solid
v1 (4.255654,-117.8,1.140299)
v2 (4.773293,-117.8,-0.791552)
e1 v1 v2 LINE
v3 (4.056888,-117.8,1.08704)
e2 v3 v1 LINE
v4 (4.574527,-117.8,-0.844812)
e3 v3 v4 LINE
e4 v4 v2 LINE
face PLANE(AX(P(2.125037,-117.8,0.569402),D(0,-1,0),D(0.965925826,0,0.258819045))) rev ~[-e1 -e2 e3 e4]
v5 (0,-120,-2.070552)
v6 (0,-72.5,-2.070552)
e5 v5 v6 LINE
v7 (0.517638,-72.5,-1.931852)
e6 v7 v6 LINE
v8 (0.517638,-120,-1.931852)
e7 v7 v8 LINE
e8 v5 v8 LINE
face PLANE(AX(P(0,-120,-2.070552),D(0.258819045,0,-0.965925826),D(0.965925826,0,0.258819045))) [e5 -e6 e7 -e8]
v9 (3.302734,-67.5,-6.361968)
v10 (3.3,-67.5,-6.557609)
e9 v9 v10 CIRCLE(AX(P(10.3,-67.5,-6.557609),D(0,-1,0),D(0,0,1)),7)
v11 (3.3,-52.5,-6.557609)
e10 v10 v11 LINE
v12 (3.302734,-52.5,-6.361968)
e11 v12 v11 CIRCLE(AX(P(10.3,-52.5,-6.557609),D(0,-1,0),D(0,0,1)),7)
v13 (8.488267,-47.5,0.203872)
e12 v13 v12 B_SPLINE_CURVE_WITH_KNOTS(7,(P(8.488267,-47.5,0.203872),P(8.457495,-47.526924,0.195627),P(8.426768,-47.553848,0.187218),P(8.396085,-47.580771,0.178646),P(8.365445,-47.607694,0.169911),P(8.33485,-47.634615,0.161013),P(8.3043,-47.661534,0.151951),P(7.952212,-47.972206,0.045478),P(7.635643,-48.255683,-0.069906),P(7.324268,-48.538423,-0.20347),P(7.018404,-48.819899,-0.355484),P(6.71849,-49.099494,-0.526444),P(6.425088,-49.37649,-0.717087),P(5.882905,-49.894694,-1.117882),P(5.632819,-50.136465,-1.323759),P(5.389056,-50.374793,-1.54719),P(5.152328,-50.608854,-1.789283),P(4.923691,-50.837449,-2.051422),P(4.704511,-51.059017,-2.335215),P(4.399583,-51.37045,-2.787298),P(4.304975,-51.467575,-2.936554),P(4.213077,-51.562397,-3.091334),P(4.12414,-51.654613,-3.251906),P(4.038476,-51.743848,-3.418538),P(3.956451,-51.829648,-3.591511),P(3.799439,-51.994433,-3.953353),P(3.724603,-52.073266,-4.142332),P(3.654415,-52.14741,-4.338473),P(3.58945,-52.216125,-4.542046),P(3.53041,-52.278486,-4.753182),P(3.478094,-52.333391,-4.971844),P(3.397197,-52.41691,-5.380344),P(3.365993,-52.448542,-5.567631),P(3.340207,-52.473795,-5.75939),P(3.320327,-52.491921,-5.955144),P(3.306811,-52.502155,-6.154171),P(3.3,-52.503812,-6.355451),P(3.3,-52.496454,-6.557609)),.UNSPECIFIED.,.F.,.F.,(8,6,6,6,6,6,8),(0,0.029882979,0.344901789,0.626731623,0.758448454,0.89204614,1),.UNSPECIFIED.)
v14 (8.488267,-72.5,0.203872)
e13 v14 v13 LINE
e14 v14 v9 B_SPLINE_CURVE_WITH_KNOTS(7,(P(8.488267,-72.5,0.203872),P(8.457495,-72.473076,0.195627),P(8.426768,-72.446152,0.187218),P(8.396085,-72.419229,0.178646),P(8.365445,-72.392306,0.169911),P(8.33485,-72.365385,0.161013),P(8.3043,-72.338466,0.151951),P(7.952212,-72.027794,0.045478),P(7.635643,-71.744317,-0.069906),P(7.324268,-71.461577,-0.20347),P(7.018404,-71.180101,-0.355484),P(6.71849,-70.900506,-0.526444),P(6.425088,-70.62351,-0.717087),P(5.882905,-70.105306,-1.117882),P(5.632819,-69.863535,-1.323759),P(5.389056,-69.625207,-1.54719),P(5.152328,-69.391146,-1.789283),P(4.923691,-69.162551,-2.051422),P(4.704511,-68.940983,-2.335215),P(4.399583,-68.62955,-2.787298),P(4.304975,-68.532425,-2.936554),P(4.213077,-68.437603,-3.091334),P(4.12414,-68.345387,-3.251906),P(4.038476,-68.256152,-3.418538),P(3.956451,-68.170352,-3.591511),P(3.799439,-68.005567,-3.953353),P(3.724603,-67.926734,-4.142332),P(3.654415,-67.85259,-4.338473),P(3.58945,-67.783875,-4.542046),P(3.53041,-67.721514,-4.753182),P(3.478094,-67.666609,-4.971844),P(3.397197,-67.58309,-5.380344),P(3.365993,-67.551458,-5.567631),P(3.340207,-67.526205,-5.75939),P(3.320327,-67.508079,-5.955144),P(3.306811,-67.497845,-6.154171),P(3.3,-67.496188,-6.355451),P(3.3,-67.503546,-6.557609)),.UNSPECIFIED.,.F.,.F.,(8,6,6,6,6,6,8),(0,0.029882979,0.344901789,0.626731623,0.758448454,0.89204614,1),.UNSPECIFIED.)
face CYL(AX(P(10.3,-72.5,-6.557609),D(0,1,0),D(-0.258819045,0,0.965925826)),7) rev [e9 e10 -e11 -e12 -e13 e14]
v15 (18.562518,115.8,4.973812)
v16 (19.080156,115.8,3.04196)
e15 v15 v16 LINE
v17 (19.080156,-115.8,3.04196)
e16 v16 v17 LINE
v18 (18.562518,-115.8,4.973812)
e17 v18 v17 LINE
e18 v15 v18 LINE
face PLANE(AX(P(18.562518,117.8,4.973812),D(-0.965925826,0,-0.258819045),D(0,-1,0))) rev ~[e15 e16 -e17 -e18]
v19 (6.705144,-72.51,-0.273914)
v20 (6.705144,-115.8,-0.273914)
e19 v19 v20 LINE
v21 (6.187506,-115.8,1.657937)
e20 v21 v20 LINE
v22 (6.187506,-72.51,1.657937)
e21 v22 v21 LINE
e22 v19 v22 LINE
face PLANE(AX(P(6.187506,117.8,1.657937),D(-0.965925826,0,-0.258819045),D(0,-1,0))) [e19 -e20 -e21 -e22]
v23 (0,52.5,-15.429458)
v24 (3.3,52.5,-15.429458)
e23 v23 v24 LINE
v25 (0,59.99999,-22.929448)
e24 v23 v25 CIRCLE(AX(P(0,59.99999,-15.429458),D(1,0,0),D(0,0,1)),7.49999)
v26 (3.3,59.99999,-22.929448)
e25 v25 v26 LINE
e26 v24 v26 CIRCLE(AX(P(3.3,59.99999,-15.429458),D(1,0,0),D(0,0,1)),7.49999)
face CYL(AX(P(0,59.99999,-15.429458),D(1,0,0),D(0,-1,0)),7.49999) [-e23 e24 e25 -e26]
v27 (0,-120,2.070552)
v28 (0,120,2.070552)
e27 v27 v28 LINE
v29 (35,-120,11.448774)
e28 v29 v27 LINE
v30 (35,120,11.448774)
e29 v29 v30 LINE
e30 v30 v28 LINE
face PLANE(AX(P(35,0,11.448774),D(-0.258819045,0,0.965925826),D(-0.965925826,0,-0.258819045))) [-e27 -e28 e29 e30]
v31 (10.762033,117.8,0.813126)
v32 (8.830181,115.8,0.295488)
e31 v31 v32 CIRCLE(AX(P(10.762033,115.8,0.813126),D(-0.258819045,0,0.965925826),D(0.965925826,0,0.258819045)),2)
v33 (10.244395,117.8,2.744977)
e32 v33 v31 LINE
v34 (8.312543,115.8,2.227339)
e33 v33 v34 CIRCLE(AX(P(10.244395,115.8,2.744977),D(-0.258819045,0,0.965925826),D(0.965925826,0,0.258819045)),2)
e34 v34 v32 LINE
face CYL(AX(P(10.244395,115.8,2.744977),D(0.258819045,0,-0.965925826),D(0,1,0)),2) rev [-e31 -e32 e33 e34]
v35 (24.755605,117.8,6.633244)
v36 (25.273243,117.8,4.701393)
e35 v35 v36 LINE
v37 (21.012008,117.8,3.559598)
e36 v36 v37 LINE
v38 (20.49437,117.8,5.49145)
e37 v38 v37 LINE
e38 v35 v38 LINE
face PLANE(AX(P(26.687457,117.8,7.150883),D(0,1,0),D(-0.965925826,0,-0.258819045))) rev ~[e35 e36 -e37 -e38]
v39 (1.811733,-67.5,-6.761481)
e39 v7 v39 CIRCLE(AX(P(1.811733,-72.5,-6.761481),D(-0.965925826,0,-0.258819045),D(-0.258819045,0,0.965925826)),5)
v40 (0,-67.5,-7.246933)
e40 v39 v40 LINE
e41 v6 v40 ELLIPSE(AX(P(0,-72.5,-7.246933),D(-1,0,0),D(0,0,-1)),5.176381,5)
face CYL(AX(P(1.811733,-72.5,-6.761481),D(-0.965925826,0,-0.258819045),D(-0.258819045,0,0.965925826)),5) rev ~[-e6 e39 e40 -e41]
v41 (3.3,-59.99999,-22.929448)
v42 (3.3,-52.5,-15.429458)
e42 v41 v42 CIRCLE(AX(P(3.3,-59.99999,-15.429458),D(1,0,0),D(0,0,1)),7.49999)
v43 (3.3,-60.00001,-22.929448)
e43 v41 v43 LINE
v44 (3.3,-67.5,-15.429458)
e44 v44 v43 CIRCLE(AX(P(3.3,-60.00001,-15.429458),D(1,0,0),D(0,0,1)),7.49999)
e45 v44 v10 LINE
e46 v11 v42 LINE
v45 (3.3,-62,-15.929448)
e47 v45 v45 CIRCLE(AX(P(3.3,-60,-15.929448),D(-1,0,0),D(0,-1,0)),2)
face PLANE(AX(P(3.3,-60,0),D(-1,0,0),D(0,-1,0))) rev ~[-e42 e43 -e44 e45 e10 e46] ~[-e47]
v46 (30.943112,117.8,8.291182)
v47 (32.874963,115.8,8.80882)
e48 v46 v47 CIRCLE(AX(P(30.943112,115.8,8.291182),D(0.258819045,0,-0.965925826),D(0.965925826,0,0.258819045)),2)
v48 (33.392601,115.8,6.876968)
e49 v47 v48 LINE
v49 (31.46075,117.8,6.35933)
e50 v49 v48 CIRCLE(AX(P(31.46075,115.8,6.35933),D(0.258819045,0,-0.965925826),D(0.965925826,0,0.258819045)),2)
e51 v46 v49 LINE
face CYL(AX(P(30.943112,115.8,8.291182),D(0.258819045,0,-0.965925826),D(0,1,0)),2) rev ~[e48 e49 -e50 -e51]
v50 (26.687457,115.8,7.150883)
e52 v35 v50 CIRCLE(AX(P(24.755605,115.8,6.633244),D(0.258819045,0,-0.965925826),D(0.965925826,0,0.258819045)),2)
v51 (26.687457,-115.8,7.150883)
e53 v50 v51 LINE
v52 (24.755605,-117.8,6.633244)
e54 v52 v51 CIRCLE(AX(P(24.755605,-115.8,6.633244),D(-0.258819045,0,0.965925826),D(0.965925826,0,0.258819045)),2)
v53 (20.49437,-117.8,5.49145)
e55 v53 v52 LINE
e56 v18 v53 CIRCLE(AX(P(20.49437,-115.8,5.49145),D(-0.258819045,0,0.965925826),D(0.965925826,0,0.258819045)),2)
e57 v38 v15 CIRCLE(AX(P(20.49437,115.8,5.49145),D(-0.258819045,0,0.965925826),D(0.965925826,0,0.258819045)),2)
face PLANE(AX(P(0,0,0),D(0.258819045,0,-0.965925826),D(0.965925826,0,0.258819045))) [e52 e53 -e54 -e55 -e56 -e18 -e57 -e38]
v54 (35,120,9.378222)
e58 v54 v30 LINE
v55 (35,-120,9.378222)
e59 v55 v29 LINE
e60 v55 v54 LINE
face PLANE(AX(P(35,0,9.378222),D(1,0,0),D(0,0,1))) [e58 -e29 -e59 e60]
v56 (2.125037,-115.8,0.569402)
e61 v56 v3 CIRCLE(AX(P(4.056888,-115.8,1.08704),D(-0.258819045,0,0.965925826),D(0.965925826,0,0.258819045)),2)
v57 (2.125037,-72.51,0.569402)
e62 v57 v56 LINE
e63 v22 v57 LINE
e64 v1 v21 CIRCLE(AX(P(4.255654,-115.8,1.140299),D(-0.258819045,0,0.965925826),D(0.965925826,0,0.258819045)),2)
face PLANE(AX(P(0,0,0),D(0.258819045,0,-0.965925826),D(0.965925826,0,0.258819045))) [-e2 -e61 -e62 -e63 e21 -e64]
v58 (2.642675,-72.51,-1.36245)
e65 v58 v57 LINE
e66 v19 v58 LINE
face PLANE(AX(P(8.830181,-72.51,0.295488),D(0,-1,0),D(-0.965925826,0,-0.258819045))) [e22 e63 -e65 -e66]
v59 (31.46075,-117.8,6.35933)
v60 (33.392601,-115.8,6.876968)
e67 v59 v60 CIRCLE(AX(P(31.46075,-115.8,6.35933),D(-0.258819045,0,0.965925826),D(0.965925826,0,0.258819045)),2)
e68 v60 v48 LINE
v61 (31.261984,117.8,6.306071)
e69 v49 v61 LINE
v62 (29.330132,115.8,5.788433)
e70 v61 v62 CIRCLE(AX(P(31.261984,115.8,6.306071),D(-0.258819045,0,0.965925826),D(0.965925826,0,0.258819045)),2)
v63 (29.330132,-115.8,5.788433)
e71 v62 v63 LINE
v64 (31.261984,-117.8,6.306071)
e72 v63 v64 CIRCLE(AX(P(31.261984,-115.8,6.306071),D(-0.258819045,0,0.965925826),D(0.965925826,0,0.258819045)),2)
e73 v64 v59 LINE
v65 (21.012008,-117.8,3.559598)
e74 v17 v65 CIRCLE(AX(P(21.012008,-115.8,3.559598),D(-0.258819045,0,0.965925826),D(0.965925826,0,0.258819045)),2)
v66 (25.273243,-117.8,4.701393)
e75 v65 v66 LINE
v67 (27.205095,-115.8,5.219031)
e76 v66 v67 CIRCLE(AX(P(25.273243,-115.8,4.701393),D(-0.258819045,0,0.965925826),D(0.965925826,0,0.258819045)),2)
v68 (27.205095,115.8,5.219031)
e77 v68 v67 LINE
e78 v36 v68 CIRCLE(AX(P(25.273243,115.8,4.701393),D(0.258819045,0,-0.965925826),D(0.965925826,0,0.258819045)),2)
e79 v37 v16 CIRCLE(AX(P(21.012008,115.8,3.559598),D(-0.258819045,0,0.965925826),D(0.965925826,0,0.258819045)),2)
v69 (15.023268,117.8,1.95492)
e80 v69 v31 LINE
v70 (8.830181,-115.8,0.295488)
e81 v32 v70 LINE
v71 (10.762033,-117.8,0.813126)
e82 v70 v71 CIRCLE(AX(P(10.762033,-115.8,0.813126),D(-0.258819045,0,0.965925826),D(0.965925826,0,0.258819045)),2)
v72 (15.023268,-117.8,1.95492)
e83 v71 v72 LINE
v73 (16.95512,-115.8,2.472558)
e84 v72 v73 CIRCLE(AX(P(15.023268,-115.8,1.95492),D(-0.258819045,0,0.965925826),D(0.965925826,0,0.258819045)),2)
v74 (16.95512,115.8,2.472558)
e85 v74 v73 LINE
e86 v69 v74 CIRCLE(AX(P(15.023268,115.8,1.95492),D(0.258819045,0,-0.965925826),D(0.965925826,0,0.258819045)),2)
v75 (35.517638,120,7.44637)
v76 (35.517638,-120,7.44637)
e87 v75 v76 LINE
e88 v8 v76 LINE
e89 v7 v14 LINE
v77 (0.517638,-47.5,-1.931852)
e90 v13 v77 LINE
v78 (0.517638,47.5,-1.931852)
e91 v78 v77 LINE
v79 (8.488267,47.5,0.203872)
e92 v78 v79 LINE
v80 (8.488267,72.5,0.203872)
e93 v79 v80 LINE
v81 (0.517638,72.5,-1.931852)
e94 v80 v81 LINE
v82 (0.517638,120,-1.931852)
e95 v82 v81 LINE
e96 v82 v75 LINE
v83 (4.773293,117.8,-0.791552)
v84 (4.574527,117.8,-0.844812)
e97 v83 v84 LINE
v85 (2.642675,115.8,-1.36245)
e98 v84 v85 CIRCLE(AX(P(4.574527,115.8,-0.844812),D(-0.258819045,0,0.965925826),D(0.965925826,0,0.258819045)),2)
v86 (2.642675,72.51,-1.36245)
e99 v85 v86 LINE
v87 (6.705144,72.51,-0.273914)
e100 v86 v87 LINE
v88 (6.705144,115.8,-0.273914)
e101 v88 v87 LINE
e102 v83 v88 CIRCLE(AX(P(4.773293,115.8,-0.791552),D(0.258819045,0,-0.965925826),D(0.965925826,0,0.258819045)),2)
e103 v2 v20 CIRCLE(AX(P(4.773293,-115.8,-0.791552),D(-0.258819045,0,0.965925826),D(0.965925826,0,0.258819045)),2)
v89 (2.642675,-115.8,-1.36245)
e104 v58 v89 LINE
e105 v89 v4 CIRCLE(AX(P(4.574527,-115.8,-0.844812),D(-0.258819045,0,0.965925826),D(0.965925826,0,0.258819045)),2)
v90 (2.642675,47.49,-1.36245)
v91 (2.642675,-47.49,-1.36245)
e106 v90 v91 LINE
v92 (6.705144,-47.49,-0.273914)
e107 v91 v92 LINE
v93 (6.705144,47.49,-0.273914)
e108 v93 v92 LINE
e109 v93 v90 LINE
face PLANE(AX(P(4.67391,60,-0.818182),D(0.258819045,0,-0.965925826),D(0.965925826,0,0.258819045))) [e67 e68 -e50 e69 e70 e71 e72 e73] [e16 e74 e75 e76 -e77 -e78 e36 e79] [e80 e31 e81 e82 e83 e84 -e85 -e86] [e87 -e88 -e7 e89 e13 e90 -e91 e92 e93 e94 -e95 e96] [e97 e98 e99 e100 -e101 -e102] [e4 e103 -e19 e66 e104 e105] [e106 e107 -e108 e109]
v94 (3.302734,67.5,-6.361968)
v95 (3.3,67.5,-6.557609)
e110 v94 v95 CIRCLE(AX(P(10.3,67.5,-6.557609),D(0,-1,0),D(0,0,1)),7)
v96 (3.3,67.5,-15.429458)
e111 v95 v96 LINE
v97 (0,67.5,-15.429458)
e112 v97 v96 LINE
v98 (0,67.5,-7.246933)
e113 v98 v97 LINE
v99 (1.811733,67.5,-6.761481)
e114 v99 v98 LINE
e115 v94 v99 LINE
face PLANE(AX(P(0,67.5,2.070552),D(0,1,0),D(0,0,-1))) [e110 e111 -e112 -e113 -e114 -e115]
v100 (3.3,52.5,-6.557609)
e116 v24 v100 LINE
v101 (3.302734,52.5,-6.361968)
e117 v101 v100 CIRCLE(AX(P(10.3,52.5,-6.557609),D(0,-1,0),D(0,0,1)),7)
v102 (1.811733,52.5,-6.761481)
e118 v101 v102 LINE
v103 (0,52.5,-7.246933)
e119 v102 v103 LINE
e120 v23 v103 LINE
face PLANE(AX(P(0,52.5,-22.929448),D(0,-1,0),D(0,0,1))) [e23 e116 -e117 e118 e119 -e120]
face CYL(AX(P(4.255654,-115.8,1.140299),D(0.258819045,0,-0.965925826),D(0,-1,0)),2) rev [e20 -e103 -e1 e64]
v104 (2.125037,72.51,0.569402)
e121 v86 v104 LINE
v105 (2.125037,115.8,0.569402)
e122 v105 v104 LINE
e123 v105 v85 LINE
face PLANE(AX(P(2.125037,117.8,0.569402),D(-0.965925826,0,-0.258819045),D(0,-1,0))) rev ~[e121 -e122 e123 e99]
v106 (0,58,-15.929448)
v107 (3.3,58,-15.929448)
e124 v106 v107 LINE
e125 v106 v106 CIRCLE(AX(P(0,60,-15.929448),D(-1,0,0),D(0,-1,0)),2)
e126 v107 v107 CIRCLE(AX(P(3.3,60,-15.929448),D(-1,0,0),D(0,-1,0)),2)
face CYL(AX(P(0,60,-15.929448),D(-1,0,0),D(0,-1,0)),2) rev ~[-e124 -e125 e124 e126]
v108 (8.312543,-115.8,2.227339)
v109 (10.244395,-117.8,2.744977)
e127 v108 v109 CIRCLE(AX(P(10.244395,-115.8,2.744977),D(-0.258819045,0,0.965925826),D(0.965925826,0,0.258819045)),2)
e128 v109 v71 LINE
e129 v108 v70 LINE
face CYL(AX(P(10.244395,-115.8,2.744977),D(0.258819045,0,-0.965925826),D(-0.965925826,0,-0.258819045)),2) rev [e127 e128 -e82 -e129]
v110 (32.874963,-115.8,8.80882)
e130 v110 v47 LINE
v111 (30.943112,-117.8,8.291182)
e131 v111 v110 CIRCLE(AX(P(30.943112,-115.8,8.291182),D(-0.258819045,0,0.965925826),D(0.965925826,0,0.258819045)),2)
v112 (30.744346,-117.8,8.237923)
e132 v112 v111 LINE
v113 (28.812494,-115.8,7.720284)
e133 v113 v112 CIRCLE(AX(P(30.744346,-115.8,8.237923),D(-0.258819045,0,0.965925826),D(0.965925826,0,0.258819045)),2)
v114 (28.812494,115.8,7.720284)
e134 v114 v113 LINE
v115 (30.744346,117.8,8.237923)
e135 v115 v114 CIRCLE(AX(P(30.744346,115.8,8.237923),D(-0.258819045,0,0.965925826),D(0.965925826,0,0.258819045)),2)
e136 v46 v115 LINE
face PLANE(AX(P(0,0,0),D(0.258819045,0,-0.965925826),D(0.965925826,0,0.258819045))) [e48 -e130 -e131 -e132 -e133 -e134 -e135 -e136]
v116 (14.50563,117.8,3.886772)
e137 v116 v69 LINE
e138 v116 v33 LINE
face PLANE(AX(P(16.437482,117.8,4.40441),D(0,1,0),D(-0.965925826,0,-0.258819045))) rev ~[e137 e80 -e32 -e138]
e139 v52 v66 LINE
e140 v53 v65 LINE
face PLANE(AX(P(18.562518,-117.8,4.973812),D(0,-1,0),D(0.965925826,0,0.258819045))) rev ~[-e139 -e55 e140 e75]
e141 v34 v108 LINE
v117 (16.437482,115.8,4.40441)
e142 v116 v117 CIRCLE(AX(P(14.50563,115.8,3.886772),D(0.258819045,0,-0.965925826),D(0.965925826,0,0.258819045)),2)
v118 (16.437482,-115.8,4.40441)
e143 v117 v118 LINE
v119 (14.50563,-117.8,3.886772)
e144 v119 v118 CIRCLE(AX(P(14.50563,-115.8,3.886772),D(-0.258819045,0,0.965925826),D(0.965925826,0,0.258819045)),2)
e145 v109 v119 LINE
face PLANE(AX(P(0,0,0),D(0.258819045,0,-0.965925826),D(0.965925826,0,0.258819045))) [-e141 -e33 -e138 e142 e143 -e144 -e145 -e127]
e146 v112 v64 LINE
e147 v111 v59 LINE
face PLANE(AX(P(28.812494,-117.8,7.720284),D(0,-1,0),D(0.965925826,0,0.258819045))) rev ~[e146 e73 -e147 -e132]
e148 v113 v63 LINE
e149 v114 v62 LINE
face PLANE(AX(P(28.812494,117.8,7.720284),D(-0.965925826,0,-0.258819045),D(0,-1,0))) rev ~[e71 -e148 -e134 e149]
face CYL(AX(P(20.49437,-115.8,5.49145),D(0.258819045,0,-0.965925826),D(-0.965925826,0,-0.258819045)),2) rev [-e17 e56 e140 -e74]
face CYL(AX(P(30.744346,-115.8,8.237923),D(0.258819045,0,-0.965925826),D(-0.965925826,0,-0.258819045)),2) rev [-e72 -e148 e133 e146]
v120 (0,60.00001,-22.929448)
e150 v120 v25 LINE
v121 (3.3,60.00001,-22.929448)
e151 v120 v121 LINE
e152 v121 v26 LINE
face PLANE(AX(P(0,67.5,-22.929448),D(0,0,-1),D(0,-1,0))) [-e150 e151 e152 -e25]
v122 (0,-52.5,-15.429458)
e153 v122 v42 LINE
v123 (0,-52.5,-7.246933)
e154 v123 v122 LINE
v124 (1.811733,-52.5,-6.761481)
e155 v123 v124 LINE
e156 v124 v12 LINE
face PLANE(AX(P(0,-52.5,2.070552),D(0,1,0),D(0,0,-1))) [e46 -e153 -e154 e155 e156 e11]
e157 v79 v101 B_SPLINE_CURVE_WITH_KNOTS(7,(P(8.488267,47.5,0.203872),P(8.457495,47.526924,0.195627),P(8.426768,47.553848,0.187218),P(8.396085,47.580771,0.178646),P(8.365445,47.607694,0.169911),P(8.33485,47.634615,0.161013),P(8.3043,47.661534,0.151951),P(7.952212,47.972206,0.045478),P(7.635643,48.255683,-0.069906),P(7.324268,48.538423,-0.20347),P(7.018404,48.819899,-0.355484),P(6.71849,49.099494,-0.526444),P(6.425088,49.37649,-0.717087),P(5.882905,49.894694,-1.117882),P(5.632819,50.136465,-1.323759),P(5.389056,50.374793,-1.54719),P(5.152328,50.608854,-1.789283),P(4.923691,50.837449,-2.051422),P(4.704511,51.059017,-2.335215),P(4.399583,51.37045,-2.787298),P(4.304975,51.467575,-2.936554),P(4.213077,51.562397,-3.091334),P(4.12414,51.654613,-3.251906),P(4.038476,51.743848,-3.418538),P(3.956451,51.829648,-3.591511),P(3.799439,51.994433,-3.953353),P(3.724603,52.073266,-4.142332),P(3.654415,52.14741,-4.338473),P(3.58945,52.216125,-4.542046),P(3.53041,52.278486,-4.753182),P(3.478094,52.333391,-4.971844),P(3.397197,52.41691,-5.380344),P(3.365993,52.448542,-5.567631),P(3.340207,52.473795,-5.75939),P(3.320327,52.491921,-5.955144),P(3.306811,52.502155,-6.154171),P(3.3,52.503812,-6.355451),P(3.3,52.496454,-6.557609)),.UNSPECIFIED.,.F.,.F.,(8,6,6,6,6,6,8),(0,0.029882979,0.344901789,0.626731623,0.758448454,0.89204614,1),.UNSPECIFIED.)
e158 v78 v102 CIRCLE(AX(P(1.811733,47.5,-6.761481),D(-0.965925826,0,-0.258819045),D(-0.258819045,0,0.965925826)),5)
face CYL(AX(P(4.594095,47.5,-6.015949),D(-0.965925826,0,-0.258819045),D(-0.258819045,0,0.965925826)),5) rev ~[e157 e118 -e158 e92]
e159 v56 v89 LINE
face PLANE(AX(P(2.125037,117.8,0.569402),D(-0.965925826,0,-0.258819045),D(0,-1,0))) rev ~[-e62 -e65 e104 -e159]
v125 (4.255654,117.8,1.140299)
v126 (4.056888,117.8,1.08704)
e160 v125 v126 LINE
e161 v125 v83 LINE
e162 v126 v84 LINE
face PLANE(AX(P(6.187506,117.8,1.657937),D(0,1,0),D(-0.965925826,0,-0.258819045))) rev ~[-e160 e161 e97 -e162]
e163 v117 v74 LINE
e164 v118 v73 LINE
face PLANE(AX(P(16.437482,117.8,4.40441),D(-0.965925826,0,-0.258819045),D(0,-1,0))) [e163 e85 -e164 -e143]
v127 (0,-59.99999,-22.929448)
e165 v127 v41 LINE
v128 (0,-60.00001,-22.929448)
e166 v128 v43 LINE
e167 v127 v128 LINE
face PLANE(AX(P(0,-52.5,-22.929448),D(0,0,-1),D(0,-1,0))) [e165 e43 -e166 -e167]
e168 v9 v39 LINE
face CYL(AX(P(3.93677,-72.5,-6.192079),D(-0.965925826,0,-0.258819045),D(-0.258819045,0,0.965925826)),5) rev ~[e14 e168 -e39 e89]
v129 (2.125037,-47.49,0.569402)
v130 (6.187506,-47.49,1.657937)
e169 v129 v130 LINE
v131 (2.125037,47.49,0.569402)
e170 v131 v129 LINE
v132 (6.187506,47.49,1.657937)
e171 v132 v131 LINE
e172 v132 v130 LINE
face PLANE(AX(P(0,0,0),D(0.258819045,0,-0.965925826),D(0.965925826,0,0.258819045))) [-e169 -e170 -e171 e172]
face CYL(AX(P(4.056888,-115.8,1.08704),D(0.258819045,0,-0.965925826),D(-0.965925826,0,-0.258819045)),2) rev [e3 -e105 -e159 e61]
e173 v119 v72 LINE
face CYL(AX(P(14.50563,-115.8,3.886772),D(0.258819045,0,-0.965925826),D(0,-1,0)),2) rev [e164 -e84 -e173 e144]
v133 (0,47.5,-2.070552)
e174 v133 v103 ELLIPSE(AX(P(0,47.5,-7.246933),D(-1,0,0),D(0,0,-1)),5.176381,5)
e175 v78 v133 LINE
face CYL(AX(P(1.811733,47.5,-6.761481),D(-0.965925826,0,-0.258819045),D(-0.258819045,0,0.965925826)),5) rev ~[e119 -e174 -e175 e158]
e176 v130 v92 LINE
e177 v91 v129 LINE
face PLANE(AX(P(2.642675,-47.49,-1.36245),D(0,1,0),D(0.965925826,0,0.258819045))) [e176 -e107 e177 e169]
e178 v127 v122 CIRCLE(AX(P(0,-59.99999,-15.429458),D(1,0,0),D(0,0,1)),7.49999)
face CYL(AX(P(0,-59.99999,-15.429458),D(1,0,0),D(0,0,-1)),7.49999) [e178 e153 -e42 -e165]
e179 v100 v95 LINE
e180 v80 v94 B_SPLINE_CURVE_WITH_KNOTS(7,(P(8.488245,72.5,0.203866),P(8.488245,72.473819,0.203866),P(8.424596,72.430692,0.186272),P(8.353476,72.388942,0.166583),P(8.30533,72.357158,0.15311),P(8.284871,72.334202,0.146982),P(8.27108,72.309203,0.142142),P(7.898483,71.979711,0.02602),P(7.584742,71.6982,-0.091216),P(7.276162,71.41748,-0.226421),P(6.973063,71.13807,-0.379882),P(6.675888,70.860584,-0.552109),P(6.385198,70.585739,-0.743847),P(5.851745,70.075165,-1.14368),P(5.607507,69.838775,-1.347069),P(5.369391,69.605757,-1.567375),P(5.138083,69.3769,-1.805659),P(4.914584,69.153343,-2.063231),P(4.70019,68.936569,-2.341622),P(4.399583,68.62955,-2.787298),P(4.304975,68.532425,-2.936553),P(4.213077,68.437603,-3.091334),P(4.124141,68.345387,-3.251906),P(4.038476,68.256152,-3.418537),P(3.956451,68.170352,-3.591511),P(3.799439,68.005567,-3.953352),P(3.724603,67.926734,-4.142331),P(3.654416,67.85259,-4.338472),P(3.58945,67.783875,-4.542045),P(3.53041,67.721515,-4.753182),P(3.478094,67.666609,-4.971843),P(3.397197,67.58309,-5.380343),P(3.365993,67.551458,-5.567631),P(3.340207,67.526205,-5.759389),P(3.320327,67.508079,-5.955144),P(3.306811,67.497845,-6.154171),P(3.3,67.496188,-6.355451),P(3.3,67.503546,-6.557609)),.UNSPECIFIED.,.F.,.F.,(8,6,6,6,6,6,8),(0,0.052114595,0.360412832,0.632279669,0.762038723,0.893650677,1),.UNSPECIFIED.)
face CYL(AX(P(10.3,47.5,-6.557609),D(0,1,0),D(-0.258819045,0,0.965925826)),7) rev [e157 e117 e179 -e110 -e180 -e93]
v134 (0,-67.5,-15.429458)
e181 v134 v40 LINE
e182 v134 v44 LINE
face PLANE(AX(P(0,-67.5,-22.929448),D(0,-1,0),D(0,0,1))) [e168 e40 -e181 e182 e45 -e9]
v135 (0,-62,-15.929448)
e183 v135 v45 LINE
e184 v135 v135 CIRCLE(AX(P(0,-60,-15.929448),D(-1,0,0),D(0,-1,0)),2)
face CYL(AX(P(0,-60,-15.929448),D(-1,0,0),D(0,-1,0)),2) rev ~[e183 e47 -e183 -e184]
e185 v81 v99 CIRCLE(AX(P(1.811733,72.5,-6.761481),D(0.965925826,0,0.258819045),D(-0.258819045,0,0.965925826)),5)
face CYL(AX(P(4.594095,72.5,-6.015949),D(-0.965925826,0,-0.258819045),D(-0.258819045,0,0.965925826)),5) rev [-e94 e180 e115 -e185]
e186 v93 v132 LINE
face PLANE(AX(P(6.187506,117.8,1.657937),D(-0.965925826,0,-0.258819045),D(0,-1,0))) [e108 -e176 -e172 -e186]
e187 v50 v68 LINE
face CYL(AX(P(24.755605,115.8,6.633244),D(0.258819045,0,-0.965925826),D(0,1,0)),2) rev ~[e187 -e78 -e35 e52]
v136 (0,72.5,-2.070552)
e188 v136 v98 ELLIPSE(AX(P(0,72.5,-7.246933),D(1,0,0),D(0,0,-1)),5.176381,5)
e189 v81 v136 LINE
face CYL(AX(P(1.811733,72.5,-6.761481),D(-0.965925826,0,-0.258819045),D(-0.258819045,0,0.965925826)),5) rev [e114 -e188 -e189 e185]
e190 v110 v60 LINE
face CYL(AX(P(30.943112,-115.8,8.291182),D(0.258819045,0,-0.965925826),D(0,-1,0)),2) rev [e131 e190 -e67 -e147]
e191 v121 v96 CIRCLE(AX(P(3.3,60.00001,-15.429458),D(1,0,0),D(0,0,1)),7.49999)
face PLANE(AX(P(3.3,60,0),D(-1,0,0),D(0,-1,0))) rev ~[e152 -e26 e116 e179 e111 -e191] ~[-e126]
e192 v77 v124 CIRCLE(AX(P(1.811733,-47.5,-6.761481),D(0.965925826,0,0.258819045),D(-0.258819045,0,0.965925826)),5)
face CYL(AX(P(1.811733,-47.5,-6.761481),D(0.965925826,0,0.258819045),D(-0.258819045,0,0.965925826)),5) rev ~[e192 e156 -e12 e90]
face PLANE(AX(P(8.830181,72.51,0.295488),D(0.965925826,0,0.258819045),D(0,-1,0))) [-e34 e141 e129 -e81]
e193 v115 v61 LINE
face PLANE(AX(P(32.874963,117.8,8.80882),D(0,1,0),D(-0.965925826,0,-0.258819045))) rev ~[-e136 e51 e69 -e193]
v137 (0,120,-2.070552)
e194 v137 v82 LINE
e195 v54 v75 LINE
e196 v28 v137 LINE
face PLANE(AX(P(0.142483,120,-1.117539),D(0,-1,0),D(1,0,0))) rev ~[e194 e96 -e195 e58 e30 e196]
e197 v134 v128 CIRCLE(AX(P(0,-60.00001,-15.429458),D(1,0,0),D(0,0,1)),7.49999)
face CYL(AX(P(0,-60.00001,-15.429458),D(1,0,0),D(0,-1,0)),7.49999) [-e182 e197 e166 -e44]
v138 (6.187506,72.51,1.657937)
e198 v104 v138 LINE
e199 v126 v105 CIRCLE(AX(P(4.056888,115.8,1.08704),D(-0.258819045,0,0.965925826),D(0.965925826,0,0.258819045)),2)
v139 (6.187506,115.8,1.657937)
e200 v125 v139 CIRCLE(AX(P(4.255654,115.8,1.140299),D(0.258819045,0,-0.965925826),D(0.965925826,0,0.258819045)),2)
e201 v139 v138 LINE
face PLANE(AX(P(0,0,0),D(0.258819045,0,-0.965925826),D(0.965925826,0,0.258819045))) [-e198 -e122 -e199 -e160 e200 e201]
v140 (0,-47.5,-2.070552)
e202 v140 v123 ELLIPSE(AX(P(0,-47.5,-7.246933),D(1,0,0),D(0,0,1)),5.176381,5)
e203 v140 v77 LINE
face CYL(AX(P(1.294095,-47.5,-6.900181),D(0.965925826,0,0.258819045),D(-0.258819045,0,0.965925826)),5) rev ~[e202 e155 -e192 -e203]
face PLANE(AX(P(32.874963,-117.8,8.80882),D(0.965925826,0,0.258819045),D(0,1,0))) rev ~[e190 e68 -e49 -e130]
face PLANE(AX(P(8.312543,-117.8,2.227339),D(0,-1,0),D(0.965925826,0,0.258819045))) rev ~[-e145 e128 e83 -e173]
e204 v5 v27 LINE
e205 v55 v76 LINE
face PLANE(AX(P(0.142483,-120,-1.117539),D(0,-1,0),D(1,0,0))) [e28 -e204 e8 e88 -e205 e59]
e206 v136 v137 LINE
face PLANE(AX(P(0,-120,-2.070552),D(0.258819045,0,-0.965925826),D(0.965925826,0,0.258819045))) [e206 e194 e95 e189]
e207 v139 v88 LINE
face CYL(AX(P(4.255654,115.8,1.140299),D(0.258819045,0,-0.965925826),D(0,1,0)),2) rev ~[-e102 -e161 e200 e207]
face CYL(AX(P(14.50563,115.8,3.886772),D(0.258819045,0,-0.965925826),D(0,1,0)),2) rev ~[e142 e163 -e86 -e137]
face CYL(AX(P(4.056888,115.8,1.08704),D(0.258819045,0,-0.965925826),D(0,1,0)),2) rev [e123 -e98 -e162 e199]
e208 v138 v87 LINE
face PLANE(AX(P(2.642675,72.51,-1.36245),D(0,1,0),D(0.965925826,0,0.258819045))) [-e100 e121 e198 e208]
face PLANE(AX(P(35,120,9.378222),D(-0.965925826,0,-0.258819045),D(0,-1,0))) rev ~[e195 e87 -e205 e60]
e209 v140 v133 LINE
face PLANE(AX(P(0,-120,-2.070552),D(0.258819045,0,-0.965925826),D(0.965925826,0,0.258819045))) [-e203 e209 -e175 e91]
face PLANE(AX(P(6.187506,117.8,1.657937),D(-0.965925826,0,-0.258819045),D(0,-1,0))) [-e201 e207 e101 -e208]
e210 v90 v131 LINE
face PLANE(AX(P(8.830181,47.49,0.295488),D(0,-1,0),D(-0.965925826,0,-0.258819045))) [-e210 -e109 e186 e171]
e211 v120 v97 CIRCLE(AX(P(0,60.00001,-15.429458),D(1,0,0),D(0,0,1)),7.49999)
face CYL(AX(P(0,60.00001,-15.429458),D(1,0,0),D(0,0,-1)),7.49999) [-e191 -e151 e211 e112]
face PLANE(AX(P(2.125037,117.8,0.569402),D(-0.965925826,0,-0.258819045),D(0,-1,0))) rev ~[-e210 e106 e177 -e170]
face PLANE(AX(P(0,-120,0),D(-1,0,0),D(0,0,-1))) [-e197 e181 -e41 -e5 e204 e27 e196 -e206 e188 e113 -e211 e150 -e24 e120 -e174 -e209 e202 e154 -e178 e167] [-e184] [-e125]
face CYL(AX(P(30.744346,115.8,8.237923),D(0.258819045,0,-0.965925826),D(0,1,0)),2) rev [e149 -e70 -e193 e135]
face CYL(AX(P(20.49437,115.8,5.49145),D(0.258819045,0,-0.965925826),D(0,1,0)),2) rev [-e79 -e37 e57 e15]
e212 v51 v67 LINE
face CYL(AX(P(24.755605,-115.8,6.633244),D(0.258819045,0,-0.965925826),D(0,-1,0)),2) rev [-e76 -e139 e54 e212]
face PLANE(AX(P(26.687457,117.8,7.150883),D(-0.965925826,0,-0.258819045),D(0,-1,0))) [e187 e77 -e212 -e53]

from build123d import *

# Parameters (mm, degrees)
F2_DEPTH  = 120
F3_W      = 36.2346663144
F3_H      = 240
F3_W_2    = 2.2
F3_H_2    = 235.6
F4_DEPTH  = 2
F5_R      = 2
F7_DEPTH  = 240
F8_W      = 15
F8_H      = 4.1411047216
F8_H_2    = 20.8588952784
F8_R      = 2
F9_DEPTH  = 3.3
F10_R     = 7.49999
F11_W     = 2.2
F11_H     = 25.02
F12_DEPTH = 2
F13_R     = 5
F14_R     = 7


# Not quite as in the source:
# - a fillet or chamfer is up to 0.001 mm smaller than in the source, because OpenCascade refuses the exact size
# - a feature names something its author has since deleted; it is built from what else it names


with BuildPart() as f2:
    # F1 (on Front) → F2 (new body, symmetric)
    with BuildSketch(Plane.XZ):
        Polygon((35, 11.4487740959), (0, 2.0705523608), (0, 0), (35, 9.3782217351), align=None)
    extrude(amount=F2_DEPTH, both=True)

    # F3 (on face) → F4 (join)
    with BuildSketch(Plane(origin=(0, 0, 0), x_dir=(0.9659258263, 0, 0.2588190451), z_dir=(0.2588190451, 0, -0.9659258263))):
        with Locations((18.1173331572, 0)):
            Rectangle(F3_W, F3_H)
        Polygon((2.2, -117.8), (2.2, 117.8), (6.4057777191, 117.8), (8.6057777191, 117.8), (17.0173331572, 117.8), (19.2173331572, 117.8), (27.6288885953, 117.8), (29.8288885953, 117.8), (34.0346663144, 117.8), (34.0346663144, -117.8), (29.8288885953, -117.8), (27.6288885953, -117.8), (19.2173331572, -117.8), (17.0173331572, -117.8), (8.6057777191, -117.8), (6.4057777191, -117.8), align=None, mode=Mode.SUBTRACT)
        with Locations((28.7288885953, 0)):
            Rectangle(F3_W_2, F3_H_2)
        with Locations((18.1173331572, 0)):
            Rectangle(F3_W_2, F3_H_2)
        with Locations((7.5057777191, 0)):
            Rectangle(F3_W_2, F3_H_2)
    extrude(amount=F4_DEPTH)

    # F5
    f5_edges = [f2.edges().sort_by_distance(p)[0] for p in [
        (33.133782, -117.8, 7.842894),
        (26.946276, -117.8, 6.184957),
        (16.696301, -117.8, 3.438484),
        (6.446325, -117.8, 0.692011),
        (29.071313, -117.8, 6.754359),
        (18.821337, -117.8, 4.007886),
        (8.571362, -117.8, 1.261413),
        (2.383856, -117.8, -0.396524),
        (2.383856, 117.8, -0.396524),
        (8.571362, 117.8, 1.261413),
        (18.821337, 117.8, 4.007886),
        (29.071313, 117.8, 6.754359),
        (33.133782, 117.8, 7.842894),
        (16.696301, 117.8, 3.438484),
        (6.446325, 117.8, 0.692011),
        (26.946276, 117.8, 6.184957),
    ]]
    fillet(f5_edges, radius=F5_R)

    # F6 (on face) → F7 (join, through all)
    with BuildSketch(Plane.XZ.offset(120)):
        Polygon((0, -2.0705523608), (0.5176380902, -1.9318516526), (0, 0), align=None)
    extrude(amount=-F7_DEPTH)

    # F8 (on face) → F9 (join)
    with BuildSketch(Plane(origin=(0, 0, 0), x_dir=(0, -1, 0), z_dir=(-1, 0, 0))):
        with Locations((-60, 0)):
            Rectangle(F8_W, F8_H)
        with Locations((-60, -12.5)):
            Rectangle(F8_W, F8_H_2)
        with Locations((-60, -15.9294476392)):
            Circle(F8_R, mode=Mode.SUBTRACT)
        with Locations((60, 0)):
            Rectangle(F8_W, F8_H)
        with Locations((60, -12.5)):
            Rectangle(F8_W, F8_H_2)
        with Locations((60, -15.9294476392)):
            Circle(F8_R, mode=Mode.SUBTRACT)
    extrude(amount=-F9_DEPTH)

    # F10 (radius 7.5 in the source; OpenCascade refuses exactly that, so slightly less here)
    f10_edges = [f2.edges().sort_by_distance(p)[0] for p in [
        (1.65, 67.5, -22.929448),
        (1.65, 52.5, -22.929448),
        (1.65, -52.5, -22.929448),
        (1.65, -67.5, -22.929448),
    ]]
    fillet(f10_edges, radius=F10_R)

    # F11 (on face) → F12 (join, through all)
    with BuildSketch(Plane(origin=(0.5176380902, 0, -1.9318516526), x_dir=(0.9659258263, 0, 0.2588190451), z_dir=(0.2588190451, 0, -0.9659258263))):
        Polygon((6.4057777191, -47.49), (2.2, -47.49), (2.2, -52.5), (2.2, -67.5), (2.2, -72.51), (6.4057777191, -72.51), align=None)
        with Locations((7.5057777191, -60)):
            Rectangle(F11_W, F11_H)
        Polygon((2.2, 52.5), (2.2, 47.49), (6.4057777191, 47.49), (6.4057777191, 72.51), (2.2, 72.51), (2.2, 67.5), align=None)
        with Locations((7.5057777191, 60)):
            Rectangle(F11_W, F11_H)
    extrude(amount=-F12_DEPTH)

    # F13
    f13_edges = [f2.edges().sort_by_distance(p)[0] for p in [
        (1.65, -52.5, -1.628436),
        (1.65, -67.5, -1.628436),
        (1.65, 52.5, -1.628436),
        (1.65, 67.5, -1.628436),
    ]]
    fillet(f13_edges, radius=F13_R)

    # F14
    f14_edges = [f2.edges().sort_by_distance(p)[0] for p in [
        (3.3, 60, -1.18632),
        (3.3, -60, -1.18632),
    ]]
    fillet(f14_edges, radius=F14_R)


solid = f2.part
